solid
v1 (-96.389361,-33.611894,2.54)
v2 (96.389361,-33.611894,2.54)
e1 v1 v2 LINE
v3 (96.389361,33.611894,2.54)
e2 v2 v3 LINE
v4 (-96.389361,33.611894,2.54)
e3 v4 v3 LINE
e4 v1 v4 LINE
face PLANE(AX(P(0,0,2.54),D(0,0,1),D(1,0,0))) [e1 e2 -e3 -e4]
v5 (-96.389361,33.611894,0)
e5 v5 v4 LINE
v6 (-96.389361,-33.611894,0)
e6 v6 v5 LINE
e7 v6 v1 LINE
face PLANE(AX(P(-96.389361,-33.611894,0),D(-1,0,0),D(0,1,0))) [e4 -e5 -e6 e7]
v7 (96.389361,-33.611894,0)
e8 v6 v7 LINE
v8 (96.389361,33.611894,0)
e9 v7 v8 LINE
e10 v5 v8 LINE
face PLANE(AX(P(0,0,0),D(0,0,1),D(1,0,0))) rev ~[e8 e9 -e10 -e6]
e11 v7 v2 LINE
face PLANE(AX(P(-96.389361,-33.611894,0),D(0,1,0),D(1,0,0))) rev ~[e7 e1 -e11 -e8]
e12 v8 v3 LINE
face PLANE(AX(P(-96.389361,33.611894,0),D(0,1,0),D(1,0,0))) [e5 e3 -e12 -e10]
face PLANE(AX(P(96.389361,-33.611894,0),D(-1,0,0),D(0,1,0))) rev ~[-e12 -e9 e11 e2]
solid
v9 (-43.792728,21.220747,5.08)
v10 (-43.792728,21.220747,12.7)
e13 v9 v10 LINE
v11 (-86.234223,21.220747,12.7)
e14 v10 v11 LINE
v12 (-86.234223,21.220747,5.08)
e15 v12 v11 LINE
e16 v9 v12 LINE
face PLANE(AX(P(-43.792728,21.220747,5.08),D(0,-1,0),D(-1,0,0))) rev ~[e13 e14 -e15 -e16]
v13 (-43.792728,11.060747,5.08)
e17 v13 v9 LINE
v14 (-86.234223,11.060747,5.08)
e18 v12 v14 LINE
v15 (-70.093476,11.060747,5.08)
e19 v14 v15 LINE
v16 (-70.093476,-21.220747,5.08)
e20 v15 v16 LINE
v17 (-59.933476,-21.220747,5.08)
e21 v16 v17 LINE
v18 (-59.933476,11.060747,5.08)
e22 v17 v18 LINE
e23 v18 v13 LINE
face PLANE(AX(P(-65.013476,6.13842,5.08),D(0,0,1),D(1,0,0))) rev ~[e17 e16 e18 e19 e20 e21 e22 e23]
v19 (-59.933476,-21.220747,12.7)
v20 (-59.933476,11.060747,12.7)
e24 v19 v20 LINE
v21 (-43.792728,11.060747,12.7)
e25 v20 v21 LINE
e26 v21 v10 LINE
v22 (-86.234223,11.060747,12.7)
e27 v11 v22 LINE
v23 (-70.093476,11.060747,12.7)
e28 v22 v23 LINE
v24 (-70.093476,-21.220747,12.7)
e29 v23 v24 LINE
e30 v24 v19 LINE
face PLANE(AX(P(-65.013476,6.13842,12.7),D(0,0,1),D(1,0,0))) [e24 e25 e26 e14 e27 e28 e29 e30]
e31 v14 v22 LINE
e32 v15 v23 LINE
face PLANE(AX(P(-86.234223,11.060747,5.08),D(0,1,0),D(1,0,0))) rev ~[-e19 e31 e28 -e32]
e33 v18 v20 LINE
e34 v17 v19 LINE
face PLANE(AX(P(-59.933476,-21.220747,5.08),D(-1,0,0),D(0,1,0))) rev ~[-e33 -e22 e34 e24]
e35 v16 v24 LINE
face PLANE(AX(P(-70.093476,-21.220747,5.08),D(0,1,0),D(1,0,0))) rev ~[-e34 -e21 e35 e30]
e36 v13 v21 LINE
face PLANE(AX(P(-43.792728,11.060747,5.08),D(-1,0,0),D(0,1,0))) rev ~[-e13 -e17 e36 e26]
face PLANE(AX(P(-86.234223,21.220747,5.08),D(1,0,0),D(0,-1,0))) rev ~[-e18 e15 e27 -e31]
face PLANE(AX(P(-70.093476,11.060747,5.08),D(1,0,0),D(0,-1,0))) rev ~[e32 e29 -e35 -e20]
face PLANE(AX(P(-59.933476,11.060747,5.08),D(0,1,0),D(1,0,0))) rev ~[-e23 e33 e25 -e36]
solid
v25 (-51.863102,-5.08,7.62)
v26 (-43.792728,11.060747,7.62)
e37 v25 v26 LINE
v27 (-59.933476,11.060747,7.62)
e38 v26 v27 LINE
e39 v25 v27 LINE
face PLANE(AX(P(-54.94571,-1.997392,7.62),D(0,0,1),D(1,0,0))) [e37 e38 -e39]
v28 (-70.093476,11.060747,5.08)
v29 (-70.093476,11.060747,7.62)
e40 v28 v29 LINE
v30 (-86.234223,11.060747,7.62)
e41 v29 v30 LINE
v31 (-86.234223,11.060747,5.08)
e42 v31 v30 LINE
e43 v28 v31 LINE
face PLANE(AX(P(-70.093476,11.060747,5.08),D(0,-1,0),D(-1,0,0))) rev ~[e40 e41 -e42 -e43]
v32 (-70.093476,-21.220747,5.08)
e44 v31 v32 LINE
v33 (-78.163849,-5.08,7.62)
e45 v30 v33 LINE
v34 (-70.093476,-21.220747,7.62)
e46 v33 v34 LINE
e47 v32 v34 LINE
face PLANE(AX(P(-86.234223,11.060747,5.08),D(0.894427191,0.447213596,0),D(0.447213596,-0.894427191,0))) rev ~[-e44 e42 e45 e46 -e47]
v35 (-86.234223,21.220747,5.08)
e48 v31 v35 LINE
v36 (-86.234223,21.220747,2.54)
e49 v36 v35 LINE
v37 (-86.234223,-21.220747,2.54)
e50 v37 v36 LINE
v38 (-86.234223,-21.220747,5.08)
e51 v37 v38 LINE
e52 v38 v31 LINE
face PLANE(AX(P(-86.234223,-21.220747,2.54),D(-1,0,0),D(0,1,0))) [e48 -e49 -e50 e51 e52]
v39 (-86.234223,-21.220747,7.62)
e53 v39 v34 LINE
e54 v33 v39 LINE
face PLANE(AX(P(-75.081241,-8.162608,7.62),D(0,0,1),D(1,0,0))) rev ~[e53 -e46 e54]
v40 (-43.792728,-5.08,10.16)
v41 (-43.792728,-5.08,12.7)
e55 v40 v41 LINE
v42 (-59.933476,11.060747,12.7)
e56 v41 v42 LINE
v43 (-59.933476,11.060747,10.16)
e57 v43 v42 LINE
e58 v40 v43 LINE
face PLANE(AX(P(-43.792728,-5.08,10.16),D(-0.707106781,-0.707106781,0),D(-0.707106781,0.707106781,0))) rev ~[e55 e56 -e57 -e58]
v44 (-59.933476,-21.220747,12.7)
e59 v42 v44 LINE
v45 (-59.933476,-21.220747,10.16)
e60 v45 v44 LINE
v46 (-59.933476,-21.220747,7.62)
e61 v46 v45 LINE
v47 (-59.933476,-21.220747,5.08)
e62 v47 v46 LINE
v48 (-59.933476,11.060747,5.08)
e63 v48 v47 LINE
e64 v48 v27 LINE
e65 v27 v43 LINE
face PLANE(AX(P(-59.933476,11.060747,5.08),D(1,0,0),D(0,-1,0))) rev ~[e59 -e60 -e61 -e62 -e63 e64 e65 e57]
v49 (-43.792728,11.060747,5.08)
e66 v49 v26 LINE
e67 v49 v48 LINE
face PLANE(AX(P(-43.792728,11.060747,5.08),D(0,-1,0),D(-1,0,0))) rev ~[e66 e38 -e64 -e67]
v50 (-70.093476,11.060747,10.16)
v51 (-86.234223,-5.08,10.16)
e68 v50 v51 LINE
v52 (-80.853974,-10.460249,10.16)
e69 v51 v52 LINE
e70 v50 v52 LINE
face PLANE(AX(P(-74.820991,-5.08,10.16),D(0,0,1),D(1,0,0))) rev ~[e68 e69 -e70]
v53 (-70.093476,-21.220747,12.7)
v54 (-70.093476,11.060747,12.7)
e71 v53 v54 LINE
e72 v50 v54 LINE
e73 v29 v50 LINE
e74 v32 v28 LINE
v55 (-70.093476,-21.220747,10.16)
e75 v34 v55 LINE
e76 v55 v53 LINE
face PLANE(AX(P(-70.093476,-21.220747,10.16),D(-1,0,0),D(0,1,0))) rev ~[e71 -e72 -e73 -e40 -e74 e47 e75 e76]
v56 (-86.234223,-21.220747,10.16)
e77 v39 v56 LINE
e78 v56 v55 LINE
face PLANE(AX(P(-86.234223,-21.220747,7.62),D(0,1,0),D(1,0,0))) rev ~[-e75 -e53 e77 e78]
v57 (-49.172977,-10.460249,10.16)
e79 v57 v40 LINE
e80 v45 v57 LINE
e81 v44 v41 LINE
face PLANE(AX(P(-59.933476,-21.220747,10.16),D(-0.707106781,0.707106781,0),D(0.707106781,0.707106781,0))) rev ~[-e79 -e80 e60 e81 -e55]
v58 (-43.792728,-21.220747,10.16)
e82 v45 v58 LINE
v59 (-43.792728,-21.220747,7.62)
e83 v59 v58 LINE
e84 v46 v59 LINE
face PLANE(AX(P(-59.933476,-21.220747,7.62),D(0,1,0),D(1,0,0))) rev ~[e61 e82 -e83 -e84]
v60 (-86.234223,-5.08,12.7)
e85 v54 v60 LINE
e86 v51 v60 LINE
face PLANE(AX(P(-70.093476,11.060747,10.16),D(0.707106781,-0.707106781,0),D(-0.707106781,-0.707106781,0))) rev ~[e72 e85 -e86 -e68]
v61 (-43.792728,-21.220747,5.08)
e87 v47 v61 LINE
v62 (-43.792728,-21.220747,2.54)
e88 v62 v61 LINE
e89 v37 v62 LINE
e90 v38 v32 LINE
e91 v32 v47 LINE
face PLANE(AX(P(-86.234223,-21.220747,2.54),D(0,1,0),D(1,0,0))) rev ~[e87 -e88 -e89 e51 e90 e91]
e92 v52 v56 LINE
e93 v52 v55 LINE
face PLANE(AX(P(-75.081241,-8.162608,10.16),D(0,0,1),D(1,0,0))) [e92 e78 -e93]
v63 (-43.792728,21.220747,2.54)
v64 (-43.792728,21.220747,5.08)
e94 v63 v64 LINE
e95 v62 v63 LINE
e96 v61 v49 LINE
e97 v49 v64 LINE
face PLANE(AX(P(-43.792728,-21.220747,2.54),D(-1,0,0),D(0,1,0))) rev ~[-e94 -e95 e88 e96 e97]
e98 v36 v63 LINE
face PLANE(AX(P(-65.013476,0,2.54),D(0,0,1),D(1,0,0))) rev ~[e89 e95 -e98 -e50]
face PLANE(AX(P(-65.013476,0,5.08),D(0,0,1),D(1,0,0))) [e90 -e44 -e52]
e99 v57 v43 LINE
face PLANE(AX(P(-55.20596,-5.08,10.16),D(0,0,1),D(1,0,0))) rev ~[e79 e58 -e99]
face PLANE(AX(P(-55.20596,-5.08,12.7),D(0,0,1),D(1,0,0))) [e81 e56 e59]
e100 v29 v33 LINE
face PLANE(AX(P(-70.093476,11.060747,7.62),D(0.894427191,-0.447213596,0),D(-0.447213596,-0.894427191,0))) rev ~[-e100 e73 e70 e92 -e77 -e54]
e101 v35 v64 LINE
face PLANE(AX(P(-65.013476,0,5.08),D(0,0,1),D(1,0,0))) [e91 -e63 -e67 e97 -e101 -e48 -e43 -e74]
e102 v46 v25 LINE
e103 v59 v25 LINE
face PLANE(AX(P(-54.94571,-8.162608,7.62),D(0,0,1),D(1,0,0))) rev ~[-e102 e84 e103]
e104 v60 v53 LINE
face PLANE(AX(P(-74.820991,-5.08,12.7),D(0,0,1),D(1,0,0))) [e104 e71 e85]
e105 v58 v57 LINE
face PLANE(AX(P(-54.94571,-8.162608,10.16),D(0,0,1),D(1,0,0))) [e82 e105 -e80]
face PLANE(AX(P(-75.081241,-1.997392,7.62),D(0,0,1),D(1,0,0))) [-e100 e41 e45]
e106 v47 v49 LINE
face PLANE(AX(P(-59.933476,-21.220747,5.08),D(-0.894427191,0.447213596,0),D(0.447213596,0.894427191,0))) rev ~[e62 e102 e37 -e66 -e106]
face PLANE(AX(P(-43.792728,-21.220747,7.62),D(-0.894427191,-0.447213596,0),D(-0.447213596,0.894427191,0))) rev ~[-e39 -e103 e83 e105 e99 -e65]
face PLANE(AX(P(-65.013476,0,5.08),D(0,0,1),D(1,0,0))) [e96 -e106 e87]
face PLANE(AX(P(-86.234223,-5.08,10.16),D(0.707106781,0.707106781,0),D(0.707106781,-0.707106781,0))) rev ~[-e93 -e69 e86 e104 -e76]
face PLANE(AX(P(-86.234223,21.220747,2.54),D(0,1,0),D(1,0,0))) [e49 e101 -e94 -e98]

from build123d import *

# Parameters (mm, degrees)
F0_W      = 192.7787214518
F0_H      = 67.2237873077
F1_DEPTH  = 2.54
F2_W      = 42.4414947629
F2_H      = 42.4414947629
F3_DEPTH  = 2.54
F5_DEPTH  = 7.62
F7_DEPTH  = 2.54
F9_DEPTH  = 2.54
F11_DEPTH = 2.54


# Not quite as in the source:
# - a feature names something its author has since deleted; it is built from what else it names


with BuildPart() as f1:
    # F0 (on Top) → F1 (new body)
    with BuildSketch(Plane.XY):
        Rectangle(F0_W, F0_H)
    extrude(amount=F1_DEPTH)


with BuildPart() as f3:
    # F2 (on face) → F3 (new body)
    with BuildSketch(Plane.XY.offset(2.54)):
        with Locations((-65.0134757161, 0)):
            Rectangle(F2_W, F2_H)
    extrude(amount=F3_DEPTH)

    # F6 (on face) → F7 (join)
    with BuildSketch(Plane.XY.offset(5.08)):
        Polygon((-70.0934757161, 11.0607473814), (-86.2342230976, 11.0607473814), (-70.0934757161, -21.2207473814), align=None)
        Polygon((-59.9334757161, 11.0607473814), (-59.9334757161, -21.2207473814), (-43.7927283347, 11.0607473814), align=None)
    extrude(amount=F7_DEPTH)

    # F8 (on face) → F9 (join)
    with BuildSketch(Plane.XY.offset(7.62)):
        Polygon((-86.2342230976, -21.2207473814), (-70.0934757161, -21.2207473814), (-70.0934757161, 11.0607473814), align=None)
        Polygon((-59.9334757161, 11.0607473814), (-59.9334757161, -21.2207473814), (-43.7927283347, -21.2207473814), align=None)
    extrude(amount=F9_DEPTH)

    # F10 (on face) → F11 (join)
    with BuildSketch(Plane.XY.offset(10.16)):
        Polygon((-70.0934757161, -21.2207473814), (-70.0934757161, 11.0607473814), (-86.2342230976, -5.08), align=None)
        Polygon((-59.9334757161, 11.0607473814), (-59.9334757161, -21.2207473814), (-43.7927283347, -5.08), align=None)
    extrude(amount=F11_DEPTH)


with BuildPart() as f5:
    # F4 (on face) → F5 (new body)
    with BuildSketch(Plane.XY.offset(5.08)):
        Polygon((-43.7927283347, 21.2207473814), (-86.2342230976, 21.2207473814), (-86.2342230976, 11.0607473814), (-70.0934757161, 11.0607473814), (-70.0934757161, -21.2207473814), (-59.9334757161, -21.2207473814), (-59.9334757161, 11.0607473814), (-43.7927283347, 11.0607473814), align=None)
    extrude(amount=F5_DEPTH)


solid = Compound([f1.part, f3.part, f5.part])
